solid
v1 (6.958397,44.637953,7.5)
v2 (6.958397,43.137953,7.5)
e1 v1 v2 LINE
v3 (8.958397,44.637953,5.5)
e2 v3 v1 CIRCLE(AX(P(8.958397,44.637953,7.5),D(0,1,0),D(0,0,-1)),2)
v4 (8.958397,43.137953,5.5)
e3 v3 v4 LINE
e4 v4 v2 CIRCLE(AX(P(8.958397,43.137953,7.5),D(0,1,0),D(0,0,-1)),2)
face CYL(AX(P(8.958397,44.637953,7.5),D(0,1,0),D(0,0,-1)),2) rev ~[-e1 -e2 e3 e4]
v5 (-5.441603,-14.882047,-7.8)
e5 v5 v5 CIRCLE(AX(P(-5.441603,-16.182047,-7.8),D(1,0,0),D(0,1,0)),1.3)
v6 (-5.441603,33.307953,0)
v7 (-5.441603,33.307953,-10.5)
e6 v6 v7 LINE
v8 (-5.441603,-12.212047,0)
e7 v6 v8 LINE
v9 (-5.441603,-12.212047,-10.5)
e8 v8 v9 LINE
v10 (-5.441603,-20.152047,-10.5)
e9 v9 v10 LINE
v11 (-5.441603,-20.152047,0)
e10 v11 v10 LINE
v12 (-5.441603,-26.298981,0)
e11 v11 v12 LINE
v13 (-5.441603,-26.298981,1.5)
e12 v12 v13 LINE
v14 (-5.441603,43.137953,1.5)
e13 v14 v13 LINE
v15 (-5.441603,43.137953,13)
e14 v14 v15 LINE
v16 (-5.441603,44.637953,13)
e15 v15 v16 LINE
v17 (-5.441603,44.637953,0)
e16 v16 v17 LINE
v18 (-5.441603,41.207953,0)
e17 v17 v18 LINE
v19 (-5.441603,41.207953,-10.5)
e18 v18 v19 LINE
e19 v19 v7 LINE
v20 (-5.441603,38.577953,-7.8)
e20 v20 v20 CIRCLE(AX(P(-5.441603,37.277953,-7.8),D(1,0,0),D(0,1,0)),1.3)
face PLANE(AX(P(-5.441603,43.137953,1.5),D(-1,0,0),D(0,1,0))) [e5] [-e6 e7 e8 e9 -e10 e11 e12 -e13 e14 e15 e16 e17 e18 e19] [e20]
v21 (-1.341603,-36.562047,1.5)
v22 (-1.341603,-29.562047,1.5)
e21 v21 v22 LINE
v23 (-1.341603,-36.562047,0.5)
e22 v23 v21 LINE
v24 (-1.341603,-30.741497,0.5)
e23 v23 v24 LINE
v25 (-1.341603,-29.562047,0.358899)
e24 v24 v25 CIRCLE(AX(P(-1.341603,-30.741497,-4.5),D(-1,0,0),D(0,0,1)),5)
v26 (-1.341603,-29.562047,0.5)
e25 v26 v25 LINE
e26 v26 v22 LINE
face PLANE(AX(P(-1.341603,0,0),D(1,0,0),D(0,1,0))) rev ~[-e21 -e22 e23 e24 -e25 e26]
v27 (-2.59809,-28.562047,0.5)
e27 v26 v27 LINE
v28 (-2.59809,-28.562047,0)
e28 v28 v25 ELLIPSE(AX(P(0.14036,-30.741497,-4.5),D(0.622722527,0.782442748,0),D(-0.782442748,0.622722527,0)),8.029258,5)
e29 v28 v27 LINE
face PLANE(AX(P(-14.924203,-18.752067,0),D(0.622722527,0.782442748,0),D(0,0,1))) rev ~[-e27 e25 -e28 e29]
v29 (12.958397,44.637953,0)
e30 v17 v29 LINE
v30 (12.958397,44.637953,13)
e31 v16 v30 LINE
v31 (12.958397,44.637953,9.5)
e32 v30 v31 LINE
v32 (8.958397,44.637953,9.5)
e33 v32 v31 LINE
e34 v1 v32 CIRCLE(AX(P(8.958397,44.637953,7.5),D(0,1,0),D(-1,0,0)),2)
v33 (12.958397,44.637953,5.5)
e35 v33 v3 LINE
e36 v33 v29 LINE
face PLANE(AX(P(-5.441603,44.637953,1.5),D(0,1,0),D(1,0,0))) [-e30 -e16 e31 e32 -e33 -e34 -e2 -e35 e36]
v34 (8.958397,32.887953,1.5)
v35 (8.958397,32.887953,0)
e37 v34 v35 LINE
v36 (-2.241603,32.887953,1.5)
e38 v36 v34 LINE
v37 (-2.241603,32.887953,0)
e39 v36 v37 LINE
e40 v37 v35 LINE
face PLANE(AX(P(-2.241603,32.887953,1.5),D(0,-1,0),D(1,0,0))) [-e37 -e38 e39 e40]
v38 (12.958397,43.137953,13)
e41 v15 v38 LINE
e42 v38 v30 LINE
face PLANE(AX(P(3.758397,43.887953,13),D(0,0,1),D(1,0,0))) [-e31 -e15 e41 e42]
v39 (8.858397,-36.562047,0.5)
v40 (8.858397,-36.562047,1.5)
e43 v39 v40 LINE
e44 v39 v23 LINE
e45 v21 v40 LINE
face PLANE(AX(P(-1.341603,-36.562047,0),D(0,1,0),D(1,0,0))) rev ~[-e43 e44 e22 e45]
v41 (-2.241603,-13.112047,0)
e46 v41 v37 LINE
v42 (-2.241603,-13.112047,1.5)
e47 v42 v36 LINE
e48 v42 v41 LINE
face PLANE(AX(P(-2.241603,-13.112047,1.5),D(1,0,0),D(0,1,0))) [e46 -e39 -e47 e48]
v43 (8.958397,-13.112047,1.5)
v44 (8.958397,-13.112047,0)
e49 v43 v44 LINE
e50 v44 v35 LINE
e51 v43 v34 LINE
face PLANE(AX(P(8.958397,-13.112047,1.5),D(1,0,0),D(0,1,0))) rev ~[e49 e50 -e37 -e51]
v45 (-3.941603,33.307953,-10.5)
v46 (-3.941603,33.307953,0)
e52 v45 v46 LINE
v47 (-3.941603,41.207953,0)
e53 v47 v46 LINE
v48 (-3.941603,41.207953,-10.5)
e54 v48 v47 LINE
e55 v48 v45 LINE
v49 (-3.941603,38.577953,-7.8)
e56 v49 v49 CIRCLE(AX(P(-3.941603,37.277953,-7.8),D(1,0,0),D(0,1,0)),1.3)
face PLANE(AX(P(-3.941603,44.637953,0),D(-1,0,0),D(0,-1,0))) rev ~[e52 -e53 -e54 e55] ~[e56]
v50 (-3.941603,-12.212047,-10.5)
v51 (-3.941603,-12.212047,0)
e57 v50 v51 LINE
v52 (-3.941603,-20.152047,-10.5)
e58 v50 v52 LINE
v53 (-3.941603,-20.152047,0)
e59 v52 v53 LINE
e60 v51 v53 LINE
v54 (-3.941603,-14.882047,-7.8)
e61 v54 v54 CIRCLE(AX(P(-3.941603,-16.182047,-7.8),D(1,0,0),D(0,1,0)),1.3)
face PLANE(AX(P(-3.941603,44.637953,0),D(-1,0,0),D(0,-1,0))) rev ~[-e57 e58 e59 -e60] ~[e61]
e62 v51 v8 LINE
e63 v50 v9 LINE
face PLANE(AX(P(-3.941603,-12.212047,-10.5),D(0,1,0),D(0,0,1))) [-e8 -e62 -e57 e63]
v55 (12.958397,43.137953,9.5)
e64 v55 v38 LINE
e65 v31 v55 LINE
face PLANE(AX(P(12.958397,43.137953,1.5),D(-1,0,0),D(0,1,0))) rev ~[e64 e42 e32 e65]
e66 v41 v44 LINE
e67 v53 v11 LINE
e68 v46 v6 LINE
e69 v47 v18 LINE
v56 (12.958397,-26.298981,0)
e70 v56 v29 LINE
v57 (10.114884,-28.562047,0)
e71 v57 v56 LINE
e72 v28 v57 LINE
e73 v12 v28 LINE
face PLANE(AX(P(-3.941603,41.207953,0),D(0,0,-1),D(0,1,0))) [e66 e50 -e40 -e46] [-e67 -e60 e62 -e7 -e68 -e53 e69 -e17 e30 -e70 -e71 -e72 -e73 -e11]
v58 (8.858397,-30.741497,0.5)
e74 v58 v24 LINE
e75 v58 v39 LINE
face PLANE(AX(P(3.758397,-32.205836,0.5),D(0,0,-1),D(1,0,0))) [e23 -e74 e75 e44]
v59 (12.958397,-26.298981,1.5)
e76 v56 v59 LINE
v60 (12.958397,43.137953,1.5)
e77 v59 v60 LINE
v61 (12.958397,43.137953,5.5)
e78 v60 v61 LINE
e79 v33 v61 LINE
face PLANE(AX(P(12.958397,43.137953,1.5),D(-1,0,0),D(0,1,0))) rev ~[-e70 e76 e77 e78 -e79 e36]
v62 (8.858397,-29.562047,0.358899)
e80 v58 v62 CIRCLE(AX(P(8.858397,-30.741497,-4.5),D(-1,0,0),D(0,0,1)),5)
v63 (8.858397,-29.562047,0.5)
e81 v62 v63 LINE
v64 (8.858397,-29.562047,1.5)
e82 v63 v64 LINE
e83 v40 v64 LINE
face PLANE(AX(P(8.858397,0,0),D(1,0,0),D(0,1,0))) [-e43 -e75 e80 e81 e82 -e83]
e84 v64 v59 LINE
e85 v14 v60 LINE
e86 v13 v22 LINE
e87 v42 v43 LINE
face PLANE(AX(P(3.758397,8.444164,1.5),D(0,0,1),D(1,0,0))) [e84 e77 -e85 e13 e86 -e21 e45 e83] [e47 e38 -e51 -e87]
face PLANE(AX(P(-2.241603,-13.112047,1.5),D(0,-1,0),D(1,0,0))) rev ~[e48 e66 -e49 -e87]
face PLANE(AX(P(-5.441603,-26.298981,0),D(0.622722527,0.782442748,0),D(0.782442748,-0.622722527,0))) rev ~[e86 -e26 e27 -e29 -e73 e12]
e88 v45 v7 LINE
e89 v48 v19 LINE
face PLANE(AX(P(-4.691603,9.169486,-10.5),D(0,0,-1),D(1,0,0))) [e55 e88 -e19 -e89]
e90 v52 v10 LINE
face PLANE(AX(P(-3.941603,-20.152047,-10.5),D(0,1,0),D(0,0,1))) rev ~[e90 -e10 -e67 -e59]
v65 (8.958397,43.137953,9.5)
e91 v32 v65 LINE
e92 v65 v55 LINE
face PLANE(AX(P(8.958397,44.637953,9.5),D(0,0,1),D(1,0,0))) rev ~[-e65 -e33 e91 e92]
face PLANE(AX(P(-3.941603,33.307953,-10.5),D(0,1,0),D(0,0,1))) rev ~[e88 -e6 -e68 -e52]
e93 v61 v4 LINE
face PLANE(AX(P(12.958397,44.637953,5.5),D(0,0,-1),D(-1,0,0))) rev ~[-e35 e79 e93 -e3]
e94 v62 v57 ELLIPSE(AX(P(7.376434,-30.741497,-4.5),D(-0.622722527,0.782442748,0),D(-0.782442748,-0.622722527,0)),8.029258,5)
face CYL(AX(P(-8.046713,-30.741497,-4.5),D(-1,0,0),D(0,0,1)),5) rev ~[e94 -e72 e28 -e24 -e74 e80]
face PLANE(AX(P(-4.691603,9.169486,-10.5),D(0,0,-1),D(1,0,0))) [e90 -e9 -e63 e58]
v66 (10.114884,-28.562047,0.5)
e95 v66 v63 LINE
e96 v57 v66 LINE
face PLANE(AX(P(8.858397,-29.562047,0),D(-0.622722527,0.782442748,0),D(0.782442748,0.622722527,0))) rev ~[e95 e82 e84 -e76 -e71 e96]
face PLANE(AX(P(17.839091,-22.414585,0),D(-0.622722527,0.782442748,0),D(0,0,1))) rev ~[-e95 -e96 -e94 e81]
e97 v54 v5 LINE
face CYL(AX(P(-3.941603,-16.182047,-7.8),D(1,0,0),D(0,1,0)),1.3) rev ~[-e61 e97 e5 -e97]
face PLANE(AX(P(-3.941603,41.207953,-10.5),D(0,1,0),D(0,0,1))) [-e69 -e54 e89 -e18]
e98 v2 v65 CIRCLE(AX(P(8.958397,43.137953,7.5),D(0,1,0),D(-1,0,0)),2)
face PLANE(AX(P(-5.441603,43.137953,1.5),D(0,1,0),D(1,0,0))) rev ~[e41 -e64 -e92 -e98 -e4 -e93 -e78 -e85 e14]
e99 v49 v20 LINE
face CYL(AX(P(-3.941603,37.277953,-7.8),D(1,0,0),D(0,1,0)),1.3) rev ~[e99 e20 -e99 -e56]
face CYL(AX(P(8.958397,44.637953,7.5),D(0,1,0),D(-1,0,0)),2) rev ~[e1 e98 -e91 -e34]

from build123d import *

# Parameters (mm, degrees)
F0_W          = 10.2
F0_H          = 7
F1_DEPTH      = 1.5
F2_W          = 11.2
F2_H          = 46
F3_DEPTH      = 25
F4_W          = 1.5
F4_H          = 70.9369339572
F5_DEPTH      = 10.5
F6_W          = 45.52
F6_H          = 10.5
F6_R          = 1.3
F6_W_2        = 3.43
F6_W_3        = 6.1469339572
F7_DEPTH      = 25
F9_DEPTH      = 0.5
F10_T4_DEPTH  = 23.6102213202
F10_T10_DEPTH = 23.6102213202
F11_W         = 18.4
F11_H         = 1.5
F12_DEPTH     = 11.5
F14_DEPTH     = 1.5


# Not quite as in the source:
# - a fillet or chamfer that OpenCascade refuses, or shapes differently, is made with other operations: its cross-section is extruded or revolved along the edge and cut away or added


with BuildPart() as f1:
    # F0 (on Top) → F1 (new body)
    with BuildSketch(Plane.XY):
        Polygon((12.9583973216, 44.6379526287), (-5.4416026784, 44.6379526287), (-5.4416026784, -26.2989813285), (-1.3416026784, -29.5620473713), (8.8583973216, -29.5620473713), (12.9583973216, -26.2989813285), align=None)
        with Locations((3.7583973216, -33.0620473713)):
            Rectangle(F0_W, F0_H)
    extrude(amount=F1_DEPTH)

    # F2 (on face) → F3 (cut)
    with BuildSketch(Plane.XY.offset(1.5)):
        with Locations((3.3583973216, 9.8879526287)):
            Rectangle(F2_W, F2_H)
    extrude(amount=-F3_DEPTH, mode=Mode.SUBTRACT)

    # F4 (on face) → F5 (join)
    with BuildSketch(Plane(origin=(0, 0, 0), x_dir=(1, 0, 0), z_dir=(0, 0, -1))):
        with Locations((-4.6916026784, -9.1694856501)):
            Rectangle(F4_W, F4_H)
    extrude(amount=F5_DEPTH)

    # F6 (on face) → F7 (cut)
    with BuildSketch(Plane.YZ.offset(-3.9416026784)):
        with Locations((10.5479526287, -5.25)):
            Rectangle(F6_W, F6_H)
        with Locations((-16.1820473713, -7.8)):
            Circle(F6_R)
        with Locations((37.2779526287, -7.8)):
            Circle(F6_R)
        with Locations((42.9229526287, -5.25)):
            Rectangle(F6_W_2, F6_H)
        with Locations((-23.2255143499, -5.25)):
            Rectangle(F6_W_3, F6_H)
    extrude(amount=-F7_DEPTH, mode=Mode.SUBTRACT)

    # F8 (on face) → F9 (cut)
    with BuildSketch(Plane(origin=(0, 0, 0), x_dir=(1, 0, 0), z_dir=(0, 0, -1))):
        Polygon((-1.3416026784, 29.5620473713), (-2.5980896591, 28.5620473713), (10.1148843023, 28.5620473713), (8.8583973216, 29.5620473713), (8.8583973216, 36.5620473713), (-1.3416026784, 36.5620473713), align=None)
    extrude(amount=-F9_DEPTH, mode=Mode.SUBTRACT)

    # F10: fillet of radius 5 on 1 edges, made by hand


with BuildPart() as f10_tool2:
    # F10_s3 → F10_t4 (new body)
    with BuildSketch(Plane.YZ.offset(-8.0467133385)):
        with BuildLine():
            ThreePointArc((-30.7414968431, 0.5), (-29.6234628544, 0.3733971724), (-28.5620473713, 0))
            Line((-28.5620473713, 0), (-28.5620473713, 0.5))
            Line((-28.5620473713, 0.5), (-30.7414968431, 0.5))
        make_face()
    extrude(amount=F10_T4_DEPTH)

    split(bisect_by=Plane.YZ.offset(8.8583973216), keep=Keep.BOTTOM)

    split(bisect_by=Plane(origin=(-14.9242028331, -18.7520665571, 0), x_dir=(0, 0, 1), z_dir=(0.6227225273, 0.7824427481, 0)), keep=Keep.TOP)


with BuildPart() as f1_1:
    add(f1.part)

    # F10_t1: union F10_tool2
    add(f10_tool2.part)


with BuildPart() as f10_tool8:
    # F10_s9 → F10_t10 (new body)
    with BuildSketch(Plane.YZ.offset(-8.0467133385)):
        with BuildLine():
            ThreePointArc((-30.7414968431, 0.5), (-29.6234628544, 0.3733971724), (-28.5620473713, 0))
            Line((-28.5620473713, 0), (-28.5620473713, 0.5))
            Line((-28.5620473713, 0.5), (-30.7414968431, 0.5))
        make_face()
    extrude(amount=F10_T10_DEPTH)

    split(bisect_by=Plane(origin=(17.8390906107, -22.4145850999, 0), x_dir=(0, 0, 1), z_dir=(-0.6227225273, 0.7824427481, 0)), keep=Keep.TOP)

    split(bisect_by=Plane.YZ.offset(-1.3416026784), keep=Keep.TOP)


with BuildPart() as f1_2:
    add(f1_1.part)

    # F10_t7: union F10_tool8
    add(f10_tool8.part)

    # F11 (on face) → F12 (join)
    with BuildSketch(Plane.XY.offset(1.5)):
        with Locations((3.7583973216, 43.8879526287)):
            Rectangle(F11_W, F11_H)
    extrude(amount=F12_DEPTH)

    # F13 (on face) → F14 (cut, through all)
    with BuildSketch(Plane(origin=(0, 44.6379526287, 0), x_dir=(-1, 0, 0), z_dir=(0, 1, 0))):
        with BuildLine():
            ThreePointArc((-6.9583973216, 7.5), (-7.5441837593, 8.9142135624), (-8.9583973216, 9.5))
            ThreePointArc((-8.9583973216, 9.5), (-10.9583973216, 7.5), (-8.9583973216, 5.5))
            ThreePointArc((-8.9583973216, 5.5), (-7.5441837593, 6.0857864376), (-6.9583973216, 7.5))
        make_face()
        with BuildLine():
            Line((-8.9583973216, 9.5), (-12.9583973216, 9.5))
            Line((-12.9583973216, 9.5), (-12.9583973216, 5.5))
            Line((-12.9583973216, 5.5), (-8.9583973216, 5.5))
            ThreePointArc((-8.9583973216, 5.5), (-10.9583973216, 7.5), (-8.9583973216, 9.5))
        make_face()
    extrude(amount=-F14_DEPTH, mode=Mode.SUBTRACT)


solid = f1_2.part
